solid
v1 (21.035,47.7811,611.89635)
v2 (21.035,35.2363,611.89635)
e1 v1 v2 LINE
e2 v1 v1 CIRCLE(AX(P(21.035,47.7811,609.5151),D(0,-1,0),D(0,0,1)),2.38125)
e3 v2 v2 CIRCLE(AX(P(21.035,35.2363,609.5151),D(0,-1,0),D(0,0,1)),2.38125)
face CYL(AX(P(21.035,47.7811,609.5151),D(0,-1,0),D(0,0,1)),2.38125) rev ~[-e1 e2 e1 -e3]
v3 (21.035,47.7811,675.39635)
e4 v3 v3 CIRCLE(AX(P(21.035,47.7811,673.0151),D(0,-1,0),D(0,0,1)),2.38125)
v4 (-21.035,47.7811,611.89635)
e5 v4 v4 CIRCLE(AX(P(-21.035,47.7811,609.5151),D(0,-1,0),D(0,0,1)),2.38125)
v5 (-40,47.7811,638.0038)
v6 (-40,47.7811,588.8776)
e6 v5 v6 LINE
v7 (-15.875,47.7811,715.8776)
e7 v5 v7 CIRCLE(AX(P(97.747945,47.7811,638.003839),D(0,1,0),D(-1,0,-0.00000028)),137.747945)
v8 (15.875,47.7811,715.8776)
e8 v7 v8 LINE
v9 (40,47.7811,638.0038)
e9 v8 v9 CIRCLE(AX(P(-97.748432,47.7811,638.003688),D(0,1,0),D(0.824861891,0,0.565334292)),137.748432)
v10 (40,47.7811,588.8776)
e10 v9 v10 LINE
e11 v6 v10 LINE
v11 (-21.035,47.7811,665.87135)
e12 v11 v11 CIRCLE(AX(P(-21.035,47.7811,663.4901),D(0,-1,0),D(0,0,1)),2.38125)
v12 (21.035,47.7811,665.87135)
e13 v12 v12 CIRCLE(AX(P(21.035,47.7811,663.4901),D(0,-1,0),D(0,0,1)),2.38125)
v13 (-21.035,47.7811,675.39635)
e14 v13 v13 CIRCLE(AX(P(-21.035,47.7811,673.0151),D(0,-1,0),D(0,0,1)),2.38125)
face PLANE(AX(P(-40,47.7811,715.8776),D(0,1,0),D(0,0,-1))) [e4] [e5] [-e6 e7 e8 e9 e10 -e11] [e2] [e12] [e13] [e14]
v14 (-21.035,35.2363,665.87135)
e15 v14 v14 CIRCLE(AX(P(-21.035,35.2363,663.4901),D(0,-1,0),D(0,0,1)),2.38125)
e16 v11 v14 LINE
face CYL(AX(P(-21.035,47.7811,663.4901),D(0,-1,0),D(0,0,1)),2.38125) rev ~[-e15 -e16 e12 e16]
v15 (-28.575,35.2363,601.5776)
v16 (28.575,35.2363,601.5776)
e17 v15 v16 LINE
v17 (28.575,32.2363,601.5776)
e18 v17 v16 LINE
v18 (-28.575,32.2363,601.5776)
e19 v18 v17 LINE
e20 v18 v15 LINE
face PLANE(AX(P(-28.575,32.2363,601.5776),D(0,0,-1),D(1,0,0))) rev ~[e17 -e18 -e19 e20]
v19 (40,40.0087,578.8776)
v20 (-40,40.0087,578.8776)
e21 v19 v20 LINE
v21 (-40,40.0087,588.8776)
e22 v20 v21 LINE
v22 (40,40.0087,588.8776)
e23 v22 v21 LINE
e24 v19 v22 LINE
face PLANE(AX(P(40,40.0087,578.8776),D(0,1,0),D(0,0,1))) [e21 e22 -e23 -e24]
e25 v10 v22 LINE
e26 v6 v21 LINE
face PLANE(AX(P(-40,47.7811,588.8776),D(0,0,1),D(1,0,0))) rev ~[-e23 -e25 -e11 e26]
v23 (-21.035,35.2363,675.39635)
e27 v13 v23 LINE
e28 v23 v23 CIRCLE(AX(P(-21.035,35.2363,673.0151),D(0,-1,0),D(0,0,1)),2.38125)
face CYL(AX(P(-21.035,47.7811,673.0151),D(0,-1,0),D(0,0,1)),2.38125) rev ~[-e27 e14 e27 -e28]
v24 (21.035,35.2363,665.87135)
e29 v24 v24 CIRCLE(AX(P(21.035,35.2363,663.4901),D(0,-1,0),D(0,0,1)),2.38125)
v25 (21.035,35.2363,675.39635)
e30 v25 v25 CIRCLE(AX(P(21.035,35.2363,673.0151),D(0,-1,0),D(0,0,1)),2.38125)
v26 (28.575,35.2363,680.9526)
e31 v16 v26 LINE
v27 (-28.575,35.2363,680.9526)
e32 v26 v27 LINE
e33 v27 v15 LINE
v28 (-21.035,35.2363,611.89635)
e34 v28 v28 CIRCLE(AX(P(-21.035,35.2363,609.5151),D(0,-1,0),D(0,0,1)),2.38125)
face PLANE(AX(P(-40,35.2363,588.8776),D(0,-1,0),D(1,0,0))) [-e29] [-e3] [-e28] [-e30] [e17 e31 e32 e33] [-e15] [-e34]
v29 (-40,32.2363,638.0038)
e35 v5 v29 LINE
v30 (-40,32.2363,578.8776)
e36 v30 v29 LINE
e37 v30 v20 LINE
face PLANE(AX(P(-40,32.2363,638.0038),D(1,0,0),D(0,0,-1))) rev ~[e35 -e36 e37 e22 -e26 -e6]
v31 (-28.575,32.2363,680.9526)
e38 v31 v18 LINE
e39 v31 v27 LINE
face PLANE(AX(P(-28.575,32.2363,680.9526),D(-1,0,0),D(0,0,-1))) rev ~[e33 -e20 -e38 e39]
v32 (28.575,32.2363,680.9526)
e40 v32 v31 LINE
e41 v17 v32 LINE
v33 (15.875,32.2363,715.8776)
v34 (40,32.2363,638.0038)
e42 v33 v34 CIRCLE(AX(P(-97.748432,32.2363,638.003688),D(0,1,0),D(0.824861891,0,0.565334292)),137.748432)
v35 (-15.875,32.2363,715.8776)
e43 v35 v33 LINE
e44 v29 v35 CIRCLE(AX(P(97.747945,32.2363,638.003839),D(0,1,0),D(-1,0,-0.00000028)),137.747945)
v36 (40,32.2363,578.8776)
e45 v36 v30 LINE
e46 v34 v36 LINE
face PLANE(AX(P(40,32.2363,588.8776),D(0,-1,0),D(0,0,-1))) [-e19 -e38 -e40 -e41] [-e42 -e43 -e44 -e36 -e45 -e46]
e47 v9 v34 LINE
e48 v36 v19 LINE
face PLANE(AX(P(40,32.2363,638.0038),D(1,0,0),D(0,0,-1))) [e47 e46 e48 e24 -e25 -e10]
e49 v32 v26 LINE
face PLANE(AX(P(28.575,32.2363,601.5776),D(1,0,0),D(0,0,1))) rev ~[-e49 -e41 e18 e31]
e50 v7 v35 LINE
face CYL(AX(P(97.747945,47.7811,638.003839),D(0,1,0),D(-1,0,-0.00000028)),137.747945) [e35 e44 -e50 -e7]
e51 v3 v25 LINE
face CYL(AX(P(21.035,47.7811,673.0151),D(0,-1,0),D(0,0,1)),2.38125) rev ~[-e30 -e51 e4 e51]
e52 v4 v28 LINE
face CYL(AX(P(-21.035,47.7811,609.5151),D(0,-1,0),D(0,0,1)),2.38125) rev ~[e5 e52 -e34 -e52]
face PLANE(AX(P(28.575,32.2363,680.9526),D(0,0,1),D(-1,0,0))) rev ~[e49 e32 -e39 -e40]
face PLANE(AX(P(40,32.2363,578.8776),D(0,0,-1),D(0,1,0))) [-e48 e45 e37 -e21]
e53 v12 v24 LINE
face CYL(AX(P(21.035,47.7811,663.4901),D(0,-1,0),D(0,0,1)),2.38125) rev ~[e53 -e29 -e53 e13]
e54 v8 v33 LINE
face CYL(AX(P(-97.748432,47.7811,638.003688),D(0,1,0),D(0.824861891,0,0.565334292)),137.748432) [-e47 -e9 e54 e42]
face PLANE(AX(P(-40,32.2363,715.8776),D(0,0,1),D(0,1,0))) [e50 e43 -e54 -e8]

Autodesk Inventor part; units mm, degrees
ref_plane "YZ Plane" through (0, 0, 0) normal (1, 0, 0) x (0, 1, 0)
ref_plane "XZ Plane" through (0, 0, 0) normal (0, 1, 0) x (-1, 0, 0)
sketch "Sketch1" plane through (0, 0, 0) normal (0, 1, 0) x (-1, 0, 0)
  line L0 (-40, 482.6) -> (-40, -482.6)
  line L1 (-40, -482.6) -> (40, -482.6)
  line L2 (40, -482.6) -> (40, 482.6)
  line L3 (40, 482.6) -> (-40, 482.6)
  line L4 (-40, 482.6) -> (40, -482.6) construction
  line L5 (-40, -482.6) -> (40, 482.6) construction
  point P0 (0, 0)
  dimension "d0" = 965.2
  dimension "d1" = 80
extrude "Extrusion1" add sketch "Sketch1" against normal blind 15.5448
ref_plane "Work Plane1" through (0, 0, 482.6) normal (1, 0, 0) x (0, 1, 0)
sketch "Sketch2" plane through (0, 0, 482.6) normal (1, 0, 0) x (0, 1, 0)
  line L0 (0, -965.2) -> (0, 0) projected
  line L1 (0, -965.2) -> (-15.5448, -965.2) projected
  line L2 (-15.5448, 0) -> (-15.5448, -965.2) projected
  line L3 (0, 0) -> (-15.5448, 0) projected
  line L4 (41.9902, -1050.1493) -> (41.9902, -1135.1493)
  line L5 (57.0671, -1050.1493) -> (57.0671, -1135.1493)
  line L6 (57.0671, -1135.1493) -> (41.9902, -1135.1493)
  line L7 (41.9902, -1092.6493) -> (57.0671, -1092.6493) construction
  line L8 (-15.5448, 0) -> (-15.5448, -965.2) construction
  line L9 (-15.5448, -965.2) -> (-15.5448, -1004.6981) construction
  line L10 (-15.5448, -1004.6981) -> (41.9902, -1021.6042) construction
  line L11 (41.9902, -1021.6042) -> (41.9902, -1050.1493) construction
  spline S0 degree 3 poles (-15.5448, -965.2) (-15.5448, -1004.6981) (41.9902, -1021.6042) (41.9902, -1050.1493) knots 1 1 1 1 2 2 2 2
  line L12 (57.0671, -1050.1493) -> (57.0671, -1021.6042) construction
  line L13 (57.0671, -1021.6042) -> (0, -1003.1803) construction
  line L14 (0, -965.2) -> (0, 0) construction
  line L15 (0, -1003.1803) -> (0, -965.2) construction
  spline S1 degree 3 poles (57.0671, -1050.1493) (57.0671, -1021.6042) (0, -1003.1803) (0, -965.2) knots 1 1 1 1 2 2 2 2
  point P0 (0, -482.6)
  dimension "d4" = 85
  dimension "d5" = 15.0769
sketch "Sketch3" plane through (0, 0, 482.6) normal (1, 0, 0) x (0, 1, 0)
  line L0 (0, 0) -> (0, -965.2) projected
  line L1 (0, 0) -> (-15.5448, 0) projected
  line L2 (-15.5448, -965.2) -> (-15.5448, 0) projected
  line L3 (0, -965.2) -> (-15.5448, -965.2) projected
  arc A0 (2.1293, 48.5593) -> (-15.5448, 0) centre (60, 0) ccw
  arc A1 (14.0373, 38.5673) -> (0, 0) centre (60, 0) ccw
  line L4 (2.1293, 48.5593) -> (18.199, 67.7104)
  line L5 (0, 0) -> (-15.5448, 0) construction
  line L6 (2.1293, 48.5593) -> (14.0373, 38.5673) construction
  line L7 (14.0373, 38.5673) -> (30.107, 57.7184)
  arc A2 (18.199, 67.7104) -> (32.2363, 106.2776) centre (-27.7637, 106.2776) ccw
  arc A3 (30.107, 57.7184) -> (47.7811, 106.2776) centre (-27.7637, 106.2776) ccw
  line L8 (32.2363, 106.2776) -> (32.2363, 233.2776)
  line L9 (32.2363, 233.2776) -> (47.7811, 233.2776)
  line L10 (47.7811, 233.2776) -> (47.7811, 106.2776)
  line L11 (30.107, 57.7184) -> (18.199, 67.7104) construction
  line L12 (32.2363, 106.2776) -> (47.7811, 106.2776) construction
  point P0 (0, -482.6)
  dimension "d17" = 127
  dimension "d18" = 140
  dimension "d19" = 60
  dimension "d21" = 140
  dimension "d22" = 25
extrude "Extrusion2" add sketch "Sketch3" along normal up to surface (80 mm away) from surface at -40 contours L1 A0 L4 A2 L8 L9 L10 A3 L7 A1
sketch "Sketch9" plane through (-40, 47.7811, 588.8776) normal (0, 1, 0) x (1, 0, 0)
  line L0 (0, -127) -> (0, 0) construction
  line L1 (0, 0) -> (0, -127) construction
  line L2 (80, -127) -> (80, 0) construction
  line L3 (0, -127) -> (0, -49.1262)
  line L4 (80, 0) -> (80, -127) projected
  line L5 (80, -49.1262) -> (80, -127)
  arc A0 (0, -49.1262) -> (24.125, -127) centre (137.7482, -49.1262) ccw
  arc A1 (55.875, -127) -> (80, -49.1262) centre (-57.7482, -49.1262) ccw
  line L6 (24.125, -127) -> (55.875, -127)
  line L7 (0, -127) -> (80, -127) projected
  line L8 (55.875, -127) -> (80, -127)
  line L9 (80, -127) -> (80, -49.1262)
  line L10 (0, -127) -> (24.125, -127)
  line L11 (55.875, -127) -> (80, -127)
  line L12 (24.125, -127) -> (0, -127)
  point P0 (40, 588.8776)
  dimension "d41" = 31.75
sketch "Sketch10" plane through (-40, 47.7811, 588.8776) normal (0, 1, 0) x (1, 0, 0)
  line L0 (11.425, -92.075) -> (68.575, -92.075) construction
  line L1 (68.575, -92.075) -> (68.575, -12.7) construction
  line L2 (68.575, -12.7) -> (11.425, -12.7) construction
  line L3 (11.425, -12.7) -> (11.425, -92.075) construction
  line L4 (11.425, -92.075) -> (68.575, -12.7) construction
  line L5 (68.575, -92.075) -> (11.425, -12.7) construction
  line L6 (12.6315, -90.043) -> (67.3685, -90.043)
  line L7 (67.3685, -90.043) -> (67.3685, -14.732)
  line L8 (67.3685, -14.732) -> (12.6315, -14.732)
  line L9 (12.6315, -14.732) -> (12.6315, -90.043)
  line L10 (12.6315, -90.043) -> (67.3685, -14.732) construction
  line L11 (67.3685, -90.043) -> (12.6315, -14.732) construction
  line L12 (18.965, -84.1375) -> (61.035, -84.1375) construction
  line L13 (61.035, -84.1375) -> (61.035, -20.6375) construction
  line L14 (61.035, -20.6375) -> (18.965, -20.6375) construction
  line L15 (18.965, -20.6375) -> (18.965, -84.1375) construction
  line L16 (18.965, -84.1375) -> (61.035, -20.6375) construction
  line L17 (61.035, -84.1375) -> (18.965, -20.6375) construction
  line L18 (18.965, -84.1375) -> (61.035, -84.1375) construction
  line L19 (61.035, -84.1375) -> (61.035, -74.6125) construction
  line L20 (61.035, -74.6125) -> (18.965, -74.6125) construction
  line L21 (18.965, -74.6125) -> (18.965, -84.1375) construction
  line L22 (68.575, -12.7) -> (80, -12.7) construction
  line L23 (11.425, -12.7) -> (0, -12.7) construction
  line L24 (0, -127) -> (0, 0) construction
  line L25 (80, -127) -> (80, 0) projected
  line L26 (0, 0) -> (80, 0) projected
  point P0 (40, 588.8776)
  point P1 (40, -52.3875)
  dimension "d33" = 57.15
  dimension "d34" = 79.375
  dimension "d35" = 54.737
  dimension "d36" = 75.311
  dimension "d37" = 42.07
  dimension "d38" = 63.5
  dimension "d39" = 9.525
  dimension "d40" = 12.7
extrude "Extrusion7" cut sketch "Sketch9" against normal through all
hole "Hole1" at (-21.035, 47.7811, 673.0151) at (-21.035, 47.7811, 663.4901) at (21.035, 47.7811, 673.0151) at (21.035, 47.7811, 663.4901) at (21.035, 47.7811, 609.5151) at (-21.035, 47.7811, 609.5151) direction (0, -1, 0) diameter 4.7625 end through all
sketch "Sketch11" plane through (-40, 32.2363, 588.8776) normal (0, -1, 0) x (1, 0, 0)
  line L0 (11.425, 92.075) -> (68.575, 92.075) construction
  line L1 (11.425, 12.7) -> (11.425, 92.075) construction
  line L2 (68.575, 92.075) -> (68.575, 12.7) construction
  line L3 (11.425, 12.7) -> (68.575, 12.7)
  line L4 (68.575, 12.7) -> (68.575, 92.075)
  line L5 (68.575, 92.075) -> (11.425, 92.075)
  line L6 (11.425, 92.075) -> (11.425, 12.7)
  line L7 (11.425, 12.7) -> (68.575, 92.075) construction
  line L8 (68.575, 12.7) -> (11.425, 92.075) construction
  point P0 (40, -588.8776)
  point P1 (40, 52.3875)
extrude "Extrusion8" cut sketch "Sketch11" against normal blind 3
sketch "Sketch12" plane through (-40, 47.7811, 588.8776) normal (0, 1, 0) x (1, 0, 0)
  line L0 (80, -127) -> (0, -127)
  line L1 (0, -127) -> (0, 0)
  line L2 (0, 0) -> (80, 0)
  line L3 (80, 0) -> (80, -127)
  line L4 (24.125, -127) -> (55.875, -127) projected
  line L5 (0, 0) -> (0, -49.1262) projected
  point P0 (40, 588.8776)
extrude "Extrusion9" cut sketch "Sketch12" against normal through all keep common part
sketch "Sketch13" plane through (40, 32.2363, 638.0038) normal (1, 0, 0) x (0, 0, -1)
  line L0 (49.1262, 15.5448) -> (49.1262, 0) projected
  line L1 (0, 15.5448) -> (49.1262, 15.5448) projected
  line L2 (0, 0) -> (0, 15.5448) projected
  line L3 (49.1262, 0) -> (0, 0) projected
  line L4 (26.1074, 3) -> (26.1074, 15.5448) projected
  line L5 (30.8699, 3) -> (30.8699, 15.5448) projected
  line L6 (-42.9488, 3) -> (36.4262, 3) projected
  line L7 (36.4262, 0) -> (36.4262, 3) projected
  line L8 (49.1262, 0) -> (59.1262, 0)
  line L9 (59.1262, 0) -> (59.1262, 7.7724)
  line L10 (59.1262, 7.7724) -> (49.1262, 7.7724)
  line L11 (49.1262, 7.7724) -> (49.1262, 0)
  line L12 (49.1262, 15.5448) -> (39.1262, 15.5448)
  line L13 (39.1262, 15.5448) -> (39.1262, 7.7724)
  line L14 (39.1262, 7.7724) -> (49.1262, 7.7724)
  line L15 (49.1262, 7.7724) -> (49.1262, 15.5448)
  line L16 (39.1262, 15.5448) -> (49.1262, 7.7724)
  line L17 (49.1262, 0) -> (49.1262, 15.5448) projected
  line L18 (39.1262, 15.5448) -> (49.1262, 15.5448)
  point P0 (638.0038, -32.2363)
  dimension "d58" = 10
extrude "Extrusion10" add sketch "Sketch13" against normal up to surface (80 mm away) contours L10 L9 L8 L0
properties part number "Metal Middle" material "Aluminum 6061"
